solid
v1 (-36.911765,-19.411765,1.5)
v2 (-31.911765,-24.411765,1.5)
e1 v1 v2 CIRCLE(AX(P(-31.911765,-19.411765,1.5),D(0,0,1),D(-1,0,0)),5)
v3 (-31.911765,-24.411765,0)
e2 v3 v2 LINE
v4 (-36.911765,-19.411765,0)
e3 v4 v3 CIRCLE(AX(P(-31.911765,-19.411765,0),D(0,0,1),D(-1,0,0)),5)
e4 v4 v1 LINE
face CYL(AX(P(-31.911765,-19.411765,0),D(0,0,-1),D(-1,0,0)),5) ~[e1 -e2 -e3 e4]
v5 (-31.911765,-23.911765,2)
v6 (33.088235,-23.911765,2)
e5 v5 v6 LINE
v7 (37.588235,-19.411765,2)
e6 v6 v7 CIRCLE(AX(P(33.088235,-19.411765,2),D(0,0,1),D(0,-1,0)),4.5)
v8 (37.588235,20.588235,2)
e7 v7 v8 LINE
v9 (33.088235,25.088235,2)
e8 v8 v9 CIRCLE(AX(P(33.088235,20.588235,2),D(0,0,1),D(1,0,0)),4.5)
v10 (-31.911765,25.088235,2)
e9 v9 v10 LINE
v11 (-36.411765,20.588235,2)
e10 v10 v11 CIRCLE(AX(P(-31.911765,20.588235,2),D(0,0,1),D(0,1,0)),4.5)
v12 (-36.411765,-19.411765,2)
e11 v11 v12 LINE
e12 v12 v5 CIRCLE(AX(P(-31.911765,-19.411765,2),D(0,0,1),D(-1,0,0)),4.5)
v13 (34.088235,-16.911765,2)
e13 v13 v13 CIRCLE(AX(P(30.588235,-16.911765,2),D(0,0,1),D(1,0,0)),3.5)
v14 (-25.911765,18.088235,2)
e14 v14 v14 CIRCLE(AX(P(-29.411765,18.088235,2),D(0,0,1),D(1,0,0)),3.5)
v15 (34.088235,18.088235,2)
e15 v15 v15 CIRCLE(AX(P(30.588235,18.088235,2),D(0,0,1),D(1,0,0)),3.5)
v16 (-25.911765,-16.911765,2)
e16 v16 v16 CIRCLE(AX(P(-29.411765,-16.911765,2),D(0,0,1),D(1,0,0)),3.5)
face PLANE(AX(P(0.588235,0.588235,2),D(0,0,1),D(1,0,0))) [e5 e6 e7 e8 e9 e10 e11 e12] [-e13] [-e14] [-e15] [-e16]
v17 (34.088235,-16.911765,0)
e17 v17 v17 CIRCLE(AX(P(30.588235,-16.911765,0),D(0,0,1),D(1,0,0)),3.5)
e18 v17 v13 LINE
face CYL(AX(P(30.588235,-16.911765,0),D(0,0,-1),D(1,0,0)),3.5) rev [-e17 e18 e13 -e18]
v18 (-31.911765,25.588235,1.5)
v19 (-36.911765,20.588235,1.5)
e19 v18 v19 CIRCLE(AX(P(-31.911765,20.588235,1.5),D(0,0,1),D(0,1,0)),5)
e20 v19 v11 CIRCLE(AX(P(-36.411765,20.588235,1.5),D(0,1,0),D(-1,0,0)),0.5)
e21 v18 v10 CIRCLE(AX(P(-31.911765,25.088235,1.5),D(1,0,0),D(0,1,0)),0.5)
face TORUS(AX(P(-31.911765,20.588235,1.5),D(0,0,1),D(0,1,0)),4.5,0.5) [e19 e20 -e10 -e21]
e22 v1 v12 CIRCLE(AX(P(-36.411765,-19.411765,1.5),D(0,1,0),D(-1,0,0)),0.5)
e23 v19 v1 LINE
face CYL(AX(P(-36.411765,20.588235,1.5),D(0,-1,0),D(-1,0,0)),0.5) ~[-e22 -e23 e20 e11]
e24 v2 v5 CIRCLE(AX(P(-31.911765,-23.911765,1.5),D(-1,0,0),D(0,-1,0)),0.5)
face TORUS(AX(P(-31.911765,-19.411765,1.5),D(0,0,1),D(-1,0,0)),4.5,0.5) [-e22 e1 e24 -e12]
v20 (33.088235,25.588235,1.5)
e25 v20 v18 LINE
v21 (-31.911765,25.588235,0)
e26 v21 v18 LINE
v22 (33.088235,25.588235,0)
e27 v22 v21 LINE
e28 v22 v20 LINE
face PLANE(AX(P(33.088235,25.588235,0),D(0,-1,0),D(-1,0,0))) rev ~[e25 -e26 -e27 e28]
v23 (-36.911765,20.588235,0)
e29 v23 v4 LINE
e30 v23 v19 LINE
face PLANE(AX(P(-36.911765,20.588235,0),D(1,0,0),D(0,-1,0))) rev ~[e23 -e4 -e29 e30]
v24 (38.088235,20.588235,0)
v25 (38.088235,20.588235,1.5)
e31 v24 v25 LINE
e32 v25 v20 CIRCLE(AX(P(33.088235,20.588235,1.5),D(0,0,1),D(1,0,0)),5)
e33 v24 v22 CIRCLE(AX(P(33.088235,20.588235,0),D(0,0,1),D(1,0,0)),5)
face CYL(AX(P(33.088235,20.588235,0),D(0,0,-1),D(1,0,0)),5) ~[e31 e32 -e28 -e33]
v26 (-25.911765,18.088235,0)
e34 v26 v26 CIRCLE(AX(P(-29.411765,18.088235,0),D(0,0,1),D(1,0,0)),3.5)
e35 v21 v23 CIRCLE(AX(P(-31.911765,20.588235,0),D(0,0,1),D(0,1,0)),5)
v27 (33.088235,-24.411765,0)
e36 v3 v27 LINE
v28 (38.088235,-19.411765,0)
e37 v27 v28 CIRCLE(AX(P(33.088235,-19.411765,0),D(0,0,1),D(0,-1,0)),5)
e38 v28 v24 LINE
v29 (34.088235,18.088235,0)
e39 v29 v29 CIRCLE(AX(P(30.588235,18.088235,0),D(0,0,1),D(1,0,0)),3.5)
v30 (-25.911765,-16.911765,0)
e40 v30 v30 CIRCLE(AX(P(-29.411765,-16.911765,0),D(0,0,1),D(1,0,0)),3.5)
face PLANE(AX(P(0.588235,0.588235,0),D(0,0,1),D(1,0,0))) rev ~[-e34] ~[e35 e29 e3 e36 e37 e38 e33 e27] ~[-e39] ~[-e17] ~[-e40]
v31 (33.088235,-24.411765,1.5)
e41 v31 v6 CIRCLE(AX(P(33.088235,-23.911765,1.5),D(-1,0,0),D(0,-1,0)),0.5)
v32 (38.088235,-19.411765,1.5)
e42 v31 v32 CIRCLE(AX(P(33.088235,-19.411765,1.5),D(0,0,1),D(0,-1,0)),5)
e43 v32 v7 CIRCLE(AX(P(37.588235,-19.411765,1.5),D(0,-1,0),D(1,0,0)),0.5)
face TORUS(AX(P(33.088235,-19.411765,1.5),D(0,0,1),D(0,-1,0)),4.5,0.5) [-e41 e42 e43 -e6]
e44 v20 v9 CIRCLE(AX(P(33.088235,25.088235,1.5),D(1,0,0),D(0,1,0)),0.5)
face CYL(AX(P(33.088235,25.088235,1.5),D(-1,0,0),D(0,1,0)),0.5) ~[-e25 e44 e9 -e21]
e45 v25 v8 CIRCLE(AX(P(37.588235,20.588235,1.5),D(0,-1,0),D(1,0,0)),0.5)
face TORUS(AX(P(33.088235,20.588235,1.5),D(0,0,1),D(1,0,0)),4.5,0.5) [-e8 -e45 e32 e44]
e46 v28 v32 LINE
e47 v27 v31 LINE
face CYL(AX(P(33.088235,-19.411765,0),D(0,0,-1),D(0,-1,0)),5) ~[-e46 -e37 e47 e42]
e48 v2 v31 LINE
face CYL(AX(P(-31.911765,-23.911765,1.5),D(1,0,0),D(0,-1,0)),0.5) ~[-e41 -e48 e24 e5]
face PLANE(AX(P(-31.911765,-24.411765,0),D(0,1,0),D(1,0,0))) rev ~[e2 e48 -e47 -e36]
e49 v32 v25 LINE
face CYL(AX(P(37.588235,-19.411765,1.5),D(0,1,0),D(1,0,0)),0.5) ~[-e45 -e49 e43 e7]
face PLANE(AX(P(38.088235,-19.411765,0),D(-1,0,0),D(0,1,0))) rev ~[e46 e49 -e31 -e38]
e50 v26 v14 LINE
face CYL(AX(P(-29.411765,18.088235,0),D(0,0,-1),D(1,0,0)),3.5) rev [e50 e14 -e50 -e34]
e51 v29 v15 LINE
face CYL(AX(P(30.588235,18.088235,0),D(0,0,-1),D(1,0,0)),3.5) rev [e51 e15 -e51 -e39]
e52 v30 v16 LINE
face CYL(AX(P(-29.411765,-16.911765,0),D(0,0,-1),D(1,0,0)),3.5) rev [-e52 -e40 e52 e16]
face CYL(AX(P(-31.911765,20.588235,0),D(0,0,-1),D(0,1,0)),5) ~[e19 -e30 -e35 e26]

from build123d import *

# Parameters (mm, degrees)
F0_R     = 3.5
F1_DEPTH = 2
F2_R     = 0.5


with BuildPart() as f1:
    # F0 (on Top) → F1 (new body)
    with BuildSketch(Plane.XY):
        with BuildLine():
            ThreePointArc((38.0882352941, 20.5882352941), (36.6237692001, 24.1237692001), (33.0882352941, 25.5882352941))
            Line((33.0882352941, 25.5882352941), (-31.9117647059, 25.5882352941))
            ThreePointArc((-31.9117647059, 25.5882352941), (-35.4472986118, 24.1237692001), (-36.9117647059, 20.5882352941))
            Line((-36.9117647059, 20.5882352941), (-36.9117647059, -19.4117647059))
            ThreePointArc((-36.9117647059, -19.4117647059), (-35.4472986118, -22.9472986118), (-31.9117647059, -24.4117647059))
            Line((-31.9117647059, -24.4117647059), (33.0882352941, -24.4117647059))
            ThreePointArc((33.0882352941, -24.4117647059), (36.6237692001, -22.9472986118), (38.0882352941, -19.4117647059))
            Line((38.0882352941, -19.4117647059), (38.0882352941, 20.5882352941))
        make_face()
        with BuildLine():
            ThreePointArc((33.0882352941, 24.5882352941), (35.9166624189, 23.4166624189), (37.0882352941, 20.5882352941))
            Line((37.0882352941, 20.5882352941), (37.0882352941, -19.4117647059))
            ThreePointArc((37.0882352941, -19.4117647059), (35.9166624189, -22.2401918306), (33.0882352941, -23.4117647059))
            Line((33.0882352941, -23.4117647059), (-31.9117647059, -23.4117647059))
            ThreePointArc((-31.9117647059, -23.4117647059), (-34.7401918306, -22.2401918306), (-35.9117647059, -19.4117647059))
            Line((-35.9117647059, -19.4117647059), (-35.9117647059, 20.5882352941))
            ThreePointArc((-35.9117647059, 20.5882352941), (-34.7401918306, 23.4166624189), (-31.9117647059, 24.5882352941))
            Line((-31.9117647059, 24.5882352941), (33.0882352941, 24.5882352941))
        make_face(mode=Mode.SUBTRACT)
        with BuildLine():
            Line((37.0882352941, -19.4117647059), (37.0882352941, 20.5882352941))
            ThreePointArc((37.0882352941, 20.5882352941), (35.9166624189, 23.4166624189), (33.0882352941, 24.5882352941))
            Line((33.0882352941, 24.5882352941), (-31.9117647059, 24.5882352941))
            ThreePointArc((-31.9117647059, 24.5882352941), (-34.7401918306, 23.4166624189), (-35.9117647059, 20.5882352941))
            Line((-35.9117647059, 20.5882352941), (-35.9117647059, -19.4117647059))
            ThreePointArc((-35.9117647059, -19.4117647059), (-34.7401918306, -22.2401918306), (-31.9117647059, -23.4117647059))
            Line((-31.9117647059, -23.4117647059), (33.0882352941, -23.4117647059))
            ThreePointArc((33.0882352941, -23.4117647059), (35.9166624189, -22.2401918306), (37.0882352941, -19.4117647059))
        make_face()
        with BuildLine():
            ThreePointArc((33.0882352941, 23.0882352941), (34.8560022471, 22.3560022471), (35.5882352941, 20.5882352941))
            Line((35.5882352941, 20.5882352941), (35.5882352941, -19.4117647059))
            ThreePointArc((35.5882352941, -19.4117647059), (34.8560022471, -21.1795316588), (33.0882352941, -21.9117647059))
            Line((33.0882352941, -21.9117647059), (-31.9117647059, -21.9117647059))
            ThreePointArc((-31.9117647059, -21.9117647059), (-33.6795316588, -21.1795316588), (-34.4117647059, -19.4117647059))
            Line((-34.4117647059, -19.4117647059), (-34.4117647059, 20.5882352941))
            ThreePointArc((-34.4117647059, 20.5882352941), (-33.6795316588, 22.3560022471), (-31.9117647059, 23.0882352941))
            Line((-31.9117647059, 23.0882352941), (33.0882352941, 23.0882352941))
        make_face(mode=Mode.SUBTRACT)
        with BuildLine():
            Line((35.5882352941, -19.4117647059), (35.5882352941, 20.5882352941))
            ThreePointArc((35.5882352941, 20.5882352941), (34.8560022471, 22.3560022471), (33.0882352941, 23.0882352941))
            Line((33.0882352941, 23.0882352941), (-31.9117647059, 23.0882352941))
            ThreePointArc((-31.9117647059, 23.0882352941), (-33.6795316588, 22.3560022471), (-34.4117647059, 20.5882352941))
            Line((-34.4117647059, 20.5882352941), (-34.4117647059, -19.4117647059))
            ThreePointArc((-34.4117647059, -19.4117647059), (-33.6795316588, -21.1795316588), (-31.9117647059, -21.9117647059))
            Line((-31.9117647059, -21.9117647059), (33.0882352941, -21.9117647059))
            ThreePointArc((33.0882352941, -21.9117647059), (34.8560022471, -21.1795316588), (35.5882352941, -19.4117647059))
        make_face()
        with BuildLine():
            ThreePointArc((33.0882352941, 22.0882352941), (34.1488954659, 21.6488954659), (34.5882352941, 20.5882352941))
            Line((34.5882352941, 20.5882352941), (34.5882352941, 14.3133180765))
            Line((34.5882352941, 14.3133180765), (34.5882352941, -13.1368474882))
            Line((34.5882352941, -13.1368474882), (34.5882352941, -19.4117647059))
            ThreePointArc((34.5882352941, -19.4117647059), (34.1488954659, -20.4724248777), (33.0882352941, -20.9117647059))
            Line((33.0882352941, -20.9117647059), (26.8133180765, -20.9117647059))
            Line((26.8133180765, -20.9117647059), (-25.6368474882, -20.9117647059))
            Line((-25.6368474882, -20.9117647059), (-31.9117647059, -20.9117647059))
            ThreePointArc((-31.9117647059, -20.9117647059), (-32.9724248777, -20.4724248777), (-33.4117647059, -19.4117647059))
            Line((-33.4117647059, -19.4117647059), (-33.4117647059, -13.1368474882))
            Line((-33.4117647059, -13.1368474882), (-33.4117647059, 14.3133180765))
            Line((-33.4117647059, 14.3133180765), (-33.4117647059, 20.5882352941))
            ThreePointArc((-33.4117647059, 20.5882352941), (-32.9724248777, 21.6488954659), (-31.9117647059, 22.0882352941))
            Line((-31.9117647059, 22.0882352941), (-25.6368474882, 22.0882352941))
            Line((-25.6368474882, 22.0882352941), (26.8133180765, 22.0882352941))
            Line((26.8133180765, 22.0882352941), (33.0882352941, 22.0882352941))
        make_face(mode=Mode.SUBTRACT)
        with BuildLine():
            Line((34.5882352941, -13.1368474882), (34.5882352941, 14.3133180765))
            ThreePointArc((34.5882352941, 14.3133180765), (26.6991479976, 14.1991479976), (26.8133180765, 22.0882352941))
            Line((26.8133180765, 22.0882352941), (-25.6368474882, 22.0882352941))
            ThreePointArc((-25.6368474882, 22.0882352941), (-25.5226774094, 14.1991479976), (-33.4117647059, 14.3133180765))
            Line((-33.4117647059, 14.3133180765), (-33.4117647059, -13.1368474882))
            ThreePointArc((-33.4117647059, -13.1368474882), (-25.5226774094, -13.0226774094), (-25.6368474882, -20.9117647059))
            Line((-25.6368474882, -20.9117647059), (26.8133180765, -20.9117647059))
            ThreePointArc((26.8133180765, -20.9117647059), (26.6991479976, -13.0226774094), (34.5882352941, -13.1368474882))
        make_face()
        with BuildLine():
            ThreePointArc((-33.4117647059, 14.3133180765), (-25.5226774094, 14.1991479976), (-25.6368474882, 22.0882352941))
            Line((-25.6368474882, 22.0882352941), (-31.9117647059, 22.0882352941))
            ThreePointArc((-31.9117647059, 22.0882352941), (-32.9724248777, 21.6488954659), (-33.4117647059, 20.5882352941))
            Line((-33.4117647059, 20.5882352941), (-33.4117647059, 14.3133180765))
        make_face()
        with Locations((-29.4117647059, 18.0882352941)):
            Circle(F0_R, mode=Mode.SUBTRACT)
        with BuildLine():
            Line((-31.9117647059, -20.9117647059), (-25.6368474882, -20.9117647059))
            ThreePointArc((-25.6368474882, -20.9117647059), (-25.5226774094, -13.0226774094), (-33.4117647059, -13.1368474882))
            Line((-33.4117647059, -13.1368474882), (-33.4117647059, -19.4117647059))
            ThreePointArc((-33.4117647059, -19.4117647059), (-32.9724248777, -20.4724248777), (-31.9117647059, -20.9117647059))
        make_face()
        with Locations((-29.4117647059, -16.9117647059)):
            Circle(F0_R, mode=Mode.SUBTRACT)
        with BuildLine():
            Line((34.5882352941, 14.3133180765), (34.5882352941, 20.5882352941))
            ThreePointArc((34.5882352941, 20.5882352941), (34.1488954659, 21.6488954659), (33.0882352941, 22.0882352941))
            Line((33.0882352941, 22.0882352941), (26.8133180765, 22.0882352941))
            ThreePointArc((26.8133180765, 22.0882352941), (26.6991479976, 14.1991479976), (34.5882352941, 14.3133180765))
        make_face()
        with Locations((30.5882352941, 18.0882352941)):
            Circle(F0_R, mode=Mode.SUBTRACT)
        with BuildLine():
            Line((34.5882352941, -19.4117647059), (34.5882352941, -13.1368474882))
            ThreePointArc((34.5882352941, -13.1368474882), (26.6991479976, -13.0226774094), (26.8133180765, -20.9117647059))
            Line((26.8133180765, -20.9117647059), (33.0882352941, -20.9117647059))
            ThreePointArc((33.0882352941, -20.9117647059), (34.1488954659, -20.4724248777), (34.5882352941, -19.4117647059))
        make_face()
        with Locations((30.5882352941, -16.9117647059)):
            Circle(F0_R, mode=Mode.SUBTRACT)
    extrude(amount=F1_DEPTH)

    # F2
    f2_edges = [f1.edges().sort_by_distance(p)[0] for p in [
        (-36.911765, 0.588235, 2),
    ]]
    fillet(f2_edges, radius=F2_R)


solid = f1.part
